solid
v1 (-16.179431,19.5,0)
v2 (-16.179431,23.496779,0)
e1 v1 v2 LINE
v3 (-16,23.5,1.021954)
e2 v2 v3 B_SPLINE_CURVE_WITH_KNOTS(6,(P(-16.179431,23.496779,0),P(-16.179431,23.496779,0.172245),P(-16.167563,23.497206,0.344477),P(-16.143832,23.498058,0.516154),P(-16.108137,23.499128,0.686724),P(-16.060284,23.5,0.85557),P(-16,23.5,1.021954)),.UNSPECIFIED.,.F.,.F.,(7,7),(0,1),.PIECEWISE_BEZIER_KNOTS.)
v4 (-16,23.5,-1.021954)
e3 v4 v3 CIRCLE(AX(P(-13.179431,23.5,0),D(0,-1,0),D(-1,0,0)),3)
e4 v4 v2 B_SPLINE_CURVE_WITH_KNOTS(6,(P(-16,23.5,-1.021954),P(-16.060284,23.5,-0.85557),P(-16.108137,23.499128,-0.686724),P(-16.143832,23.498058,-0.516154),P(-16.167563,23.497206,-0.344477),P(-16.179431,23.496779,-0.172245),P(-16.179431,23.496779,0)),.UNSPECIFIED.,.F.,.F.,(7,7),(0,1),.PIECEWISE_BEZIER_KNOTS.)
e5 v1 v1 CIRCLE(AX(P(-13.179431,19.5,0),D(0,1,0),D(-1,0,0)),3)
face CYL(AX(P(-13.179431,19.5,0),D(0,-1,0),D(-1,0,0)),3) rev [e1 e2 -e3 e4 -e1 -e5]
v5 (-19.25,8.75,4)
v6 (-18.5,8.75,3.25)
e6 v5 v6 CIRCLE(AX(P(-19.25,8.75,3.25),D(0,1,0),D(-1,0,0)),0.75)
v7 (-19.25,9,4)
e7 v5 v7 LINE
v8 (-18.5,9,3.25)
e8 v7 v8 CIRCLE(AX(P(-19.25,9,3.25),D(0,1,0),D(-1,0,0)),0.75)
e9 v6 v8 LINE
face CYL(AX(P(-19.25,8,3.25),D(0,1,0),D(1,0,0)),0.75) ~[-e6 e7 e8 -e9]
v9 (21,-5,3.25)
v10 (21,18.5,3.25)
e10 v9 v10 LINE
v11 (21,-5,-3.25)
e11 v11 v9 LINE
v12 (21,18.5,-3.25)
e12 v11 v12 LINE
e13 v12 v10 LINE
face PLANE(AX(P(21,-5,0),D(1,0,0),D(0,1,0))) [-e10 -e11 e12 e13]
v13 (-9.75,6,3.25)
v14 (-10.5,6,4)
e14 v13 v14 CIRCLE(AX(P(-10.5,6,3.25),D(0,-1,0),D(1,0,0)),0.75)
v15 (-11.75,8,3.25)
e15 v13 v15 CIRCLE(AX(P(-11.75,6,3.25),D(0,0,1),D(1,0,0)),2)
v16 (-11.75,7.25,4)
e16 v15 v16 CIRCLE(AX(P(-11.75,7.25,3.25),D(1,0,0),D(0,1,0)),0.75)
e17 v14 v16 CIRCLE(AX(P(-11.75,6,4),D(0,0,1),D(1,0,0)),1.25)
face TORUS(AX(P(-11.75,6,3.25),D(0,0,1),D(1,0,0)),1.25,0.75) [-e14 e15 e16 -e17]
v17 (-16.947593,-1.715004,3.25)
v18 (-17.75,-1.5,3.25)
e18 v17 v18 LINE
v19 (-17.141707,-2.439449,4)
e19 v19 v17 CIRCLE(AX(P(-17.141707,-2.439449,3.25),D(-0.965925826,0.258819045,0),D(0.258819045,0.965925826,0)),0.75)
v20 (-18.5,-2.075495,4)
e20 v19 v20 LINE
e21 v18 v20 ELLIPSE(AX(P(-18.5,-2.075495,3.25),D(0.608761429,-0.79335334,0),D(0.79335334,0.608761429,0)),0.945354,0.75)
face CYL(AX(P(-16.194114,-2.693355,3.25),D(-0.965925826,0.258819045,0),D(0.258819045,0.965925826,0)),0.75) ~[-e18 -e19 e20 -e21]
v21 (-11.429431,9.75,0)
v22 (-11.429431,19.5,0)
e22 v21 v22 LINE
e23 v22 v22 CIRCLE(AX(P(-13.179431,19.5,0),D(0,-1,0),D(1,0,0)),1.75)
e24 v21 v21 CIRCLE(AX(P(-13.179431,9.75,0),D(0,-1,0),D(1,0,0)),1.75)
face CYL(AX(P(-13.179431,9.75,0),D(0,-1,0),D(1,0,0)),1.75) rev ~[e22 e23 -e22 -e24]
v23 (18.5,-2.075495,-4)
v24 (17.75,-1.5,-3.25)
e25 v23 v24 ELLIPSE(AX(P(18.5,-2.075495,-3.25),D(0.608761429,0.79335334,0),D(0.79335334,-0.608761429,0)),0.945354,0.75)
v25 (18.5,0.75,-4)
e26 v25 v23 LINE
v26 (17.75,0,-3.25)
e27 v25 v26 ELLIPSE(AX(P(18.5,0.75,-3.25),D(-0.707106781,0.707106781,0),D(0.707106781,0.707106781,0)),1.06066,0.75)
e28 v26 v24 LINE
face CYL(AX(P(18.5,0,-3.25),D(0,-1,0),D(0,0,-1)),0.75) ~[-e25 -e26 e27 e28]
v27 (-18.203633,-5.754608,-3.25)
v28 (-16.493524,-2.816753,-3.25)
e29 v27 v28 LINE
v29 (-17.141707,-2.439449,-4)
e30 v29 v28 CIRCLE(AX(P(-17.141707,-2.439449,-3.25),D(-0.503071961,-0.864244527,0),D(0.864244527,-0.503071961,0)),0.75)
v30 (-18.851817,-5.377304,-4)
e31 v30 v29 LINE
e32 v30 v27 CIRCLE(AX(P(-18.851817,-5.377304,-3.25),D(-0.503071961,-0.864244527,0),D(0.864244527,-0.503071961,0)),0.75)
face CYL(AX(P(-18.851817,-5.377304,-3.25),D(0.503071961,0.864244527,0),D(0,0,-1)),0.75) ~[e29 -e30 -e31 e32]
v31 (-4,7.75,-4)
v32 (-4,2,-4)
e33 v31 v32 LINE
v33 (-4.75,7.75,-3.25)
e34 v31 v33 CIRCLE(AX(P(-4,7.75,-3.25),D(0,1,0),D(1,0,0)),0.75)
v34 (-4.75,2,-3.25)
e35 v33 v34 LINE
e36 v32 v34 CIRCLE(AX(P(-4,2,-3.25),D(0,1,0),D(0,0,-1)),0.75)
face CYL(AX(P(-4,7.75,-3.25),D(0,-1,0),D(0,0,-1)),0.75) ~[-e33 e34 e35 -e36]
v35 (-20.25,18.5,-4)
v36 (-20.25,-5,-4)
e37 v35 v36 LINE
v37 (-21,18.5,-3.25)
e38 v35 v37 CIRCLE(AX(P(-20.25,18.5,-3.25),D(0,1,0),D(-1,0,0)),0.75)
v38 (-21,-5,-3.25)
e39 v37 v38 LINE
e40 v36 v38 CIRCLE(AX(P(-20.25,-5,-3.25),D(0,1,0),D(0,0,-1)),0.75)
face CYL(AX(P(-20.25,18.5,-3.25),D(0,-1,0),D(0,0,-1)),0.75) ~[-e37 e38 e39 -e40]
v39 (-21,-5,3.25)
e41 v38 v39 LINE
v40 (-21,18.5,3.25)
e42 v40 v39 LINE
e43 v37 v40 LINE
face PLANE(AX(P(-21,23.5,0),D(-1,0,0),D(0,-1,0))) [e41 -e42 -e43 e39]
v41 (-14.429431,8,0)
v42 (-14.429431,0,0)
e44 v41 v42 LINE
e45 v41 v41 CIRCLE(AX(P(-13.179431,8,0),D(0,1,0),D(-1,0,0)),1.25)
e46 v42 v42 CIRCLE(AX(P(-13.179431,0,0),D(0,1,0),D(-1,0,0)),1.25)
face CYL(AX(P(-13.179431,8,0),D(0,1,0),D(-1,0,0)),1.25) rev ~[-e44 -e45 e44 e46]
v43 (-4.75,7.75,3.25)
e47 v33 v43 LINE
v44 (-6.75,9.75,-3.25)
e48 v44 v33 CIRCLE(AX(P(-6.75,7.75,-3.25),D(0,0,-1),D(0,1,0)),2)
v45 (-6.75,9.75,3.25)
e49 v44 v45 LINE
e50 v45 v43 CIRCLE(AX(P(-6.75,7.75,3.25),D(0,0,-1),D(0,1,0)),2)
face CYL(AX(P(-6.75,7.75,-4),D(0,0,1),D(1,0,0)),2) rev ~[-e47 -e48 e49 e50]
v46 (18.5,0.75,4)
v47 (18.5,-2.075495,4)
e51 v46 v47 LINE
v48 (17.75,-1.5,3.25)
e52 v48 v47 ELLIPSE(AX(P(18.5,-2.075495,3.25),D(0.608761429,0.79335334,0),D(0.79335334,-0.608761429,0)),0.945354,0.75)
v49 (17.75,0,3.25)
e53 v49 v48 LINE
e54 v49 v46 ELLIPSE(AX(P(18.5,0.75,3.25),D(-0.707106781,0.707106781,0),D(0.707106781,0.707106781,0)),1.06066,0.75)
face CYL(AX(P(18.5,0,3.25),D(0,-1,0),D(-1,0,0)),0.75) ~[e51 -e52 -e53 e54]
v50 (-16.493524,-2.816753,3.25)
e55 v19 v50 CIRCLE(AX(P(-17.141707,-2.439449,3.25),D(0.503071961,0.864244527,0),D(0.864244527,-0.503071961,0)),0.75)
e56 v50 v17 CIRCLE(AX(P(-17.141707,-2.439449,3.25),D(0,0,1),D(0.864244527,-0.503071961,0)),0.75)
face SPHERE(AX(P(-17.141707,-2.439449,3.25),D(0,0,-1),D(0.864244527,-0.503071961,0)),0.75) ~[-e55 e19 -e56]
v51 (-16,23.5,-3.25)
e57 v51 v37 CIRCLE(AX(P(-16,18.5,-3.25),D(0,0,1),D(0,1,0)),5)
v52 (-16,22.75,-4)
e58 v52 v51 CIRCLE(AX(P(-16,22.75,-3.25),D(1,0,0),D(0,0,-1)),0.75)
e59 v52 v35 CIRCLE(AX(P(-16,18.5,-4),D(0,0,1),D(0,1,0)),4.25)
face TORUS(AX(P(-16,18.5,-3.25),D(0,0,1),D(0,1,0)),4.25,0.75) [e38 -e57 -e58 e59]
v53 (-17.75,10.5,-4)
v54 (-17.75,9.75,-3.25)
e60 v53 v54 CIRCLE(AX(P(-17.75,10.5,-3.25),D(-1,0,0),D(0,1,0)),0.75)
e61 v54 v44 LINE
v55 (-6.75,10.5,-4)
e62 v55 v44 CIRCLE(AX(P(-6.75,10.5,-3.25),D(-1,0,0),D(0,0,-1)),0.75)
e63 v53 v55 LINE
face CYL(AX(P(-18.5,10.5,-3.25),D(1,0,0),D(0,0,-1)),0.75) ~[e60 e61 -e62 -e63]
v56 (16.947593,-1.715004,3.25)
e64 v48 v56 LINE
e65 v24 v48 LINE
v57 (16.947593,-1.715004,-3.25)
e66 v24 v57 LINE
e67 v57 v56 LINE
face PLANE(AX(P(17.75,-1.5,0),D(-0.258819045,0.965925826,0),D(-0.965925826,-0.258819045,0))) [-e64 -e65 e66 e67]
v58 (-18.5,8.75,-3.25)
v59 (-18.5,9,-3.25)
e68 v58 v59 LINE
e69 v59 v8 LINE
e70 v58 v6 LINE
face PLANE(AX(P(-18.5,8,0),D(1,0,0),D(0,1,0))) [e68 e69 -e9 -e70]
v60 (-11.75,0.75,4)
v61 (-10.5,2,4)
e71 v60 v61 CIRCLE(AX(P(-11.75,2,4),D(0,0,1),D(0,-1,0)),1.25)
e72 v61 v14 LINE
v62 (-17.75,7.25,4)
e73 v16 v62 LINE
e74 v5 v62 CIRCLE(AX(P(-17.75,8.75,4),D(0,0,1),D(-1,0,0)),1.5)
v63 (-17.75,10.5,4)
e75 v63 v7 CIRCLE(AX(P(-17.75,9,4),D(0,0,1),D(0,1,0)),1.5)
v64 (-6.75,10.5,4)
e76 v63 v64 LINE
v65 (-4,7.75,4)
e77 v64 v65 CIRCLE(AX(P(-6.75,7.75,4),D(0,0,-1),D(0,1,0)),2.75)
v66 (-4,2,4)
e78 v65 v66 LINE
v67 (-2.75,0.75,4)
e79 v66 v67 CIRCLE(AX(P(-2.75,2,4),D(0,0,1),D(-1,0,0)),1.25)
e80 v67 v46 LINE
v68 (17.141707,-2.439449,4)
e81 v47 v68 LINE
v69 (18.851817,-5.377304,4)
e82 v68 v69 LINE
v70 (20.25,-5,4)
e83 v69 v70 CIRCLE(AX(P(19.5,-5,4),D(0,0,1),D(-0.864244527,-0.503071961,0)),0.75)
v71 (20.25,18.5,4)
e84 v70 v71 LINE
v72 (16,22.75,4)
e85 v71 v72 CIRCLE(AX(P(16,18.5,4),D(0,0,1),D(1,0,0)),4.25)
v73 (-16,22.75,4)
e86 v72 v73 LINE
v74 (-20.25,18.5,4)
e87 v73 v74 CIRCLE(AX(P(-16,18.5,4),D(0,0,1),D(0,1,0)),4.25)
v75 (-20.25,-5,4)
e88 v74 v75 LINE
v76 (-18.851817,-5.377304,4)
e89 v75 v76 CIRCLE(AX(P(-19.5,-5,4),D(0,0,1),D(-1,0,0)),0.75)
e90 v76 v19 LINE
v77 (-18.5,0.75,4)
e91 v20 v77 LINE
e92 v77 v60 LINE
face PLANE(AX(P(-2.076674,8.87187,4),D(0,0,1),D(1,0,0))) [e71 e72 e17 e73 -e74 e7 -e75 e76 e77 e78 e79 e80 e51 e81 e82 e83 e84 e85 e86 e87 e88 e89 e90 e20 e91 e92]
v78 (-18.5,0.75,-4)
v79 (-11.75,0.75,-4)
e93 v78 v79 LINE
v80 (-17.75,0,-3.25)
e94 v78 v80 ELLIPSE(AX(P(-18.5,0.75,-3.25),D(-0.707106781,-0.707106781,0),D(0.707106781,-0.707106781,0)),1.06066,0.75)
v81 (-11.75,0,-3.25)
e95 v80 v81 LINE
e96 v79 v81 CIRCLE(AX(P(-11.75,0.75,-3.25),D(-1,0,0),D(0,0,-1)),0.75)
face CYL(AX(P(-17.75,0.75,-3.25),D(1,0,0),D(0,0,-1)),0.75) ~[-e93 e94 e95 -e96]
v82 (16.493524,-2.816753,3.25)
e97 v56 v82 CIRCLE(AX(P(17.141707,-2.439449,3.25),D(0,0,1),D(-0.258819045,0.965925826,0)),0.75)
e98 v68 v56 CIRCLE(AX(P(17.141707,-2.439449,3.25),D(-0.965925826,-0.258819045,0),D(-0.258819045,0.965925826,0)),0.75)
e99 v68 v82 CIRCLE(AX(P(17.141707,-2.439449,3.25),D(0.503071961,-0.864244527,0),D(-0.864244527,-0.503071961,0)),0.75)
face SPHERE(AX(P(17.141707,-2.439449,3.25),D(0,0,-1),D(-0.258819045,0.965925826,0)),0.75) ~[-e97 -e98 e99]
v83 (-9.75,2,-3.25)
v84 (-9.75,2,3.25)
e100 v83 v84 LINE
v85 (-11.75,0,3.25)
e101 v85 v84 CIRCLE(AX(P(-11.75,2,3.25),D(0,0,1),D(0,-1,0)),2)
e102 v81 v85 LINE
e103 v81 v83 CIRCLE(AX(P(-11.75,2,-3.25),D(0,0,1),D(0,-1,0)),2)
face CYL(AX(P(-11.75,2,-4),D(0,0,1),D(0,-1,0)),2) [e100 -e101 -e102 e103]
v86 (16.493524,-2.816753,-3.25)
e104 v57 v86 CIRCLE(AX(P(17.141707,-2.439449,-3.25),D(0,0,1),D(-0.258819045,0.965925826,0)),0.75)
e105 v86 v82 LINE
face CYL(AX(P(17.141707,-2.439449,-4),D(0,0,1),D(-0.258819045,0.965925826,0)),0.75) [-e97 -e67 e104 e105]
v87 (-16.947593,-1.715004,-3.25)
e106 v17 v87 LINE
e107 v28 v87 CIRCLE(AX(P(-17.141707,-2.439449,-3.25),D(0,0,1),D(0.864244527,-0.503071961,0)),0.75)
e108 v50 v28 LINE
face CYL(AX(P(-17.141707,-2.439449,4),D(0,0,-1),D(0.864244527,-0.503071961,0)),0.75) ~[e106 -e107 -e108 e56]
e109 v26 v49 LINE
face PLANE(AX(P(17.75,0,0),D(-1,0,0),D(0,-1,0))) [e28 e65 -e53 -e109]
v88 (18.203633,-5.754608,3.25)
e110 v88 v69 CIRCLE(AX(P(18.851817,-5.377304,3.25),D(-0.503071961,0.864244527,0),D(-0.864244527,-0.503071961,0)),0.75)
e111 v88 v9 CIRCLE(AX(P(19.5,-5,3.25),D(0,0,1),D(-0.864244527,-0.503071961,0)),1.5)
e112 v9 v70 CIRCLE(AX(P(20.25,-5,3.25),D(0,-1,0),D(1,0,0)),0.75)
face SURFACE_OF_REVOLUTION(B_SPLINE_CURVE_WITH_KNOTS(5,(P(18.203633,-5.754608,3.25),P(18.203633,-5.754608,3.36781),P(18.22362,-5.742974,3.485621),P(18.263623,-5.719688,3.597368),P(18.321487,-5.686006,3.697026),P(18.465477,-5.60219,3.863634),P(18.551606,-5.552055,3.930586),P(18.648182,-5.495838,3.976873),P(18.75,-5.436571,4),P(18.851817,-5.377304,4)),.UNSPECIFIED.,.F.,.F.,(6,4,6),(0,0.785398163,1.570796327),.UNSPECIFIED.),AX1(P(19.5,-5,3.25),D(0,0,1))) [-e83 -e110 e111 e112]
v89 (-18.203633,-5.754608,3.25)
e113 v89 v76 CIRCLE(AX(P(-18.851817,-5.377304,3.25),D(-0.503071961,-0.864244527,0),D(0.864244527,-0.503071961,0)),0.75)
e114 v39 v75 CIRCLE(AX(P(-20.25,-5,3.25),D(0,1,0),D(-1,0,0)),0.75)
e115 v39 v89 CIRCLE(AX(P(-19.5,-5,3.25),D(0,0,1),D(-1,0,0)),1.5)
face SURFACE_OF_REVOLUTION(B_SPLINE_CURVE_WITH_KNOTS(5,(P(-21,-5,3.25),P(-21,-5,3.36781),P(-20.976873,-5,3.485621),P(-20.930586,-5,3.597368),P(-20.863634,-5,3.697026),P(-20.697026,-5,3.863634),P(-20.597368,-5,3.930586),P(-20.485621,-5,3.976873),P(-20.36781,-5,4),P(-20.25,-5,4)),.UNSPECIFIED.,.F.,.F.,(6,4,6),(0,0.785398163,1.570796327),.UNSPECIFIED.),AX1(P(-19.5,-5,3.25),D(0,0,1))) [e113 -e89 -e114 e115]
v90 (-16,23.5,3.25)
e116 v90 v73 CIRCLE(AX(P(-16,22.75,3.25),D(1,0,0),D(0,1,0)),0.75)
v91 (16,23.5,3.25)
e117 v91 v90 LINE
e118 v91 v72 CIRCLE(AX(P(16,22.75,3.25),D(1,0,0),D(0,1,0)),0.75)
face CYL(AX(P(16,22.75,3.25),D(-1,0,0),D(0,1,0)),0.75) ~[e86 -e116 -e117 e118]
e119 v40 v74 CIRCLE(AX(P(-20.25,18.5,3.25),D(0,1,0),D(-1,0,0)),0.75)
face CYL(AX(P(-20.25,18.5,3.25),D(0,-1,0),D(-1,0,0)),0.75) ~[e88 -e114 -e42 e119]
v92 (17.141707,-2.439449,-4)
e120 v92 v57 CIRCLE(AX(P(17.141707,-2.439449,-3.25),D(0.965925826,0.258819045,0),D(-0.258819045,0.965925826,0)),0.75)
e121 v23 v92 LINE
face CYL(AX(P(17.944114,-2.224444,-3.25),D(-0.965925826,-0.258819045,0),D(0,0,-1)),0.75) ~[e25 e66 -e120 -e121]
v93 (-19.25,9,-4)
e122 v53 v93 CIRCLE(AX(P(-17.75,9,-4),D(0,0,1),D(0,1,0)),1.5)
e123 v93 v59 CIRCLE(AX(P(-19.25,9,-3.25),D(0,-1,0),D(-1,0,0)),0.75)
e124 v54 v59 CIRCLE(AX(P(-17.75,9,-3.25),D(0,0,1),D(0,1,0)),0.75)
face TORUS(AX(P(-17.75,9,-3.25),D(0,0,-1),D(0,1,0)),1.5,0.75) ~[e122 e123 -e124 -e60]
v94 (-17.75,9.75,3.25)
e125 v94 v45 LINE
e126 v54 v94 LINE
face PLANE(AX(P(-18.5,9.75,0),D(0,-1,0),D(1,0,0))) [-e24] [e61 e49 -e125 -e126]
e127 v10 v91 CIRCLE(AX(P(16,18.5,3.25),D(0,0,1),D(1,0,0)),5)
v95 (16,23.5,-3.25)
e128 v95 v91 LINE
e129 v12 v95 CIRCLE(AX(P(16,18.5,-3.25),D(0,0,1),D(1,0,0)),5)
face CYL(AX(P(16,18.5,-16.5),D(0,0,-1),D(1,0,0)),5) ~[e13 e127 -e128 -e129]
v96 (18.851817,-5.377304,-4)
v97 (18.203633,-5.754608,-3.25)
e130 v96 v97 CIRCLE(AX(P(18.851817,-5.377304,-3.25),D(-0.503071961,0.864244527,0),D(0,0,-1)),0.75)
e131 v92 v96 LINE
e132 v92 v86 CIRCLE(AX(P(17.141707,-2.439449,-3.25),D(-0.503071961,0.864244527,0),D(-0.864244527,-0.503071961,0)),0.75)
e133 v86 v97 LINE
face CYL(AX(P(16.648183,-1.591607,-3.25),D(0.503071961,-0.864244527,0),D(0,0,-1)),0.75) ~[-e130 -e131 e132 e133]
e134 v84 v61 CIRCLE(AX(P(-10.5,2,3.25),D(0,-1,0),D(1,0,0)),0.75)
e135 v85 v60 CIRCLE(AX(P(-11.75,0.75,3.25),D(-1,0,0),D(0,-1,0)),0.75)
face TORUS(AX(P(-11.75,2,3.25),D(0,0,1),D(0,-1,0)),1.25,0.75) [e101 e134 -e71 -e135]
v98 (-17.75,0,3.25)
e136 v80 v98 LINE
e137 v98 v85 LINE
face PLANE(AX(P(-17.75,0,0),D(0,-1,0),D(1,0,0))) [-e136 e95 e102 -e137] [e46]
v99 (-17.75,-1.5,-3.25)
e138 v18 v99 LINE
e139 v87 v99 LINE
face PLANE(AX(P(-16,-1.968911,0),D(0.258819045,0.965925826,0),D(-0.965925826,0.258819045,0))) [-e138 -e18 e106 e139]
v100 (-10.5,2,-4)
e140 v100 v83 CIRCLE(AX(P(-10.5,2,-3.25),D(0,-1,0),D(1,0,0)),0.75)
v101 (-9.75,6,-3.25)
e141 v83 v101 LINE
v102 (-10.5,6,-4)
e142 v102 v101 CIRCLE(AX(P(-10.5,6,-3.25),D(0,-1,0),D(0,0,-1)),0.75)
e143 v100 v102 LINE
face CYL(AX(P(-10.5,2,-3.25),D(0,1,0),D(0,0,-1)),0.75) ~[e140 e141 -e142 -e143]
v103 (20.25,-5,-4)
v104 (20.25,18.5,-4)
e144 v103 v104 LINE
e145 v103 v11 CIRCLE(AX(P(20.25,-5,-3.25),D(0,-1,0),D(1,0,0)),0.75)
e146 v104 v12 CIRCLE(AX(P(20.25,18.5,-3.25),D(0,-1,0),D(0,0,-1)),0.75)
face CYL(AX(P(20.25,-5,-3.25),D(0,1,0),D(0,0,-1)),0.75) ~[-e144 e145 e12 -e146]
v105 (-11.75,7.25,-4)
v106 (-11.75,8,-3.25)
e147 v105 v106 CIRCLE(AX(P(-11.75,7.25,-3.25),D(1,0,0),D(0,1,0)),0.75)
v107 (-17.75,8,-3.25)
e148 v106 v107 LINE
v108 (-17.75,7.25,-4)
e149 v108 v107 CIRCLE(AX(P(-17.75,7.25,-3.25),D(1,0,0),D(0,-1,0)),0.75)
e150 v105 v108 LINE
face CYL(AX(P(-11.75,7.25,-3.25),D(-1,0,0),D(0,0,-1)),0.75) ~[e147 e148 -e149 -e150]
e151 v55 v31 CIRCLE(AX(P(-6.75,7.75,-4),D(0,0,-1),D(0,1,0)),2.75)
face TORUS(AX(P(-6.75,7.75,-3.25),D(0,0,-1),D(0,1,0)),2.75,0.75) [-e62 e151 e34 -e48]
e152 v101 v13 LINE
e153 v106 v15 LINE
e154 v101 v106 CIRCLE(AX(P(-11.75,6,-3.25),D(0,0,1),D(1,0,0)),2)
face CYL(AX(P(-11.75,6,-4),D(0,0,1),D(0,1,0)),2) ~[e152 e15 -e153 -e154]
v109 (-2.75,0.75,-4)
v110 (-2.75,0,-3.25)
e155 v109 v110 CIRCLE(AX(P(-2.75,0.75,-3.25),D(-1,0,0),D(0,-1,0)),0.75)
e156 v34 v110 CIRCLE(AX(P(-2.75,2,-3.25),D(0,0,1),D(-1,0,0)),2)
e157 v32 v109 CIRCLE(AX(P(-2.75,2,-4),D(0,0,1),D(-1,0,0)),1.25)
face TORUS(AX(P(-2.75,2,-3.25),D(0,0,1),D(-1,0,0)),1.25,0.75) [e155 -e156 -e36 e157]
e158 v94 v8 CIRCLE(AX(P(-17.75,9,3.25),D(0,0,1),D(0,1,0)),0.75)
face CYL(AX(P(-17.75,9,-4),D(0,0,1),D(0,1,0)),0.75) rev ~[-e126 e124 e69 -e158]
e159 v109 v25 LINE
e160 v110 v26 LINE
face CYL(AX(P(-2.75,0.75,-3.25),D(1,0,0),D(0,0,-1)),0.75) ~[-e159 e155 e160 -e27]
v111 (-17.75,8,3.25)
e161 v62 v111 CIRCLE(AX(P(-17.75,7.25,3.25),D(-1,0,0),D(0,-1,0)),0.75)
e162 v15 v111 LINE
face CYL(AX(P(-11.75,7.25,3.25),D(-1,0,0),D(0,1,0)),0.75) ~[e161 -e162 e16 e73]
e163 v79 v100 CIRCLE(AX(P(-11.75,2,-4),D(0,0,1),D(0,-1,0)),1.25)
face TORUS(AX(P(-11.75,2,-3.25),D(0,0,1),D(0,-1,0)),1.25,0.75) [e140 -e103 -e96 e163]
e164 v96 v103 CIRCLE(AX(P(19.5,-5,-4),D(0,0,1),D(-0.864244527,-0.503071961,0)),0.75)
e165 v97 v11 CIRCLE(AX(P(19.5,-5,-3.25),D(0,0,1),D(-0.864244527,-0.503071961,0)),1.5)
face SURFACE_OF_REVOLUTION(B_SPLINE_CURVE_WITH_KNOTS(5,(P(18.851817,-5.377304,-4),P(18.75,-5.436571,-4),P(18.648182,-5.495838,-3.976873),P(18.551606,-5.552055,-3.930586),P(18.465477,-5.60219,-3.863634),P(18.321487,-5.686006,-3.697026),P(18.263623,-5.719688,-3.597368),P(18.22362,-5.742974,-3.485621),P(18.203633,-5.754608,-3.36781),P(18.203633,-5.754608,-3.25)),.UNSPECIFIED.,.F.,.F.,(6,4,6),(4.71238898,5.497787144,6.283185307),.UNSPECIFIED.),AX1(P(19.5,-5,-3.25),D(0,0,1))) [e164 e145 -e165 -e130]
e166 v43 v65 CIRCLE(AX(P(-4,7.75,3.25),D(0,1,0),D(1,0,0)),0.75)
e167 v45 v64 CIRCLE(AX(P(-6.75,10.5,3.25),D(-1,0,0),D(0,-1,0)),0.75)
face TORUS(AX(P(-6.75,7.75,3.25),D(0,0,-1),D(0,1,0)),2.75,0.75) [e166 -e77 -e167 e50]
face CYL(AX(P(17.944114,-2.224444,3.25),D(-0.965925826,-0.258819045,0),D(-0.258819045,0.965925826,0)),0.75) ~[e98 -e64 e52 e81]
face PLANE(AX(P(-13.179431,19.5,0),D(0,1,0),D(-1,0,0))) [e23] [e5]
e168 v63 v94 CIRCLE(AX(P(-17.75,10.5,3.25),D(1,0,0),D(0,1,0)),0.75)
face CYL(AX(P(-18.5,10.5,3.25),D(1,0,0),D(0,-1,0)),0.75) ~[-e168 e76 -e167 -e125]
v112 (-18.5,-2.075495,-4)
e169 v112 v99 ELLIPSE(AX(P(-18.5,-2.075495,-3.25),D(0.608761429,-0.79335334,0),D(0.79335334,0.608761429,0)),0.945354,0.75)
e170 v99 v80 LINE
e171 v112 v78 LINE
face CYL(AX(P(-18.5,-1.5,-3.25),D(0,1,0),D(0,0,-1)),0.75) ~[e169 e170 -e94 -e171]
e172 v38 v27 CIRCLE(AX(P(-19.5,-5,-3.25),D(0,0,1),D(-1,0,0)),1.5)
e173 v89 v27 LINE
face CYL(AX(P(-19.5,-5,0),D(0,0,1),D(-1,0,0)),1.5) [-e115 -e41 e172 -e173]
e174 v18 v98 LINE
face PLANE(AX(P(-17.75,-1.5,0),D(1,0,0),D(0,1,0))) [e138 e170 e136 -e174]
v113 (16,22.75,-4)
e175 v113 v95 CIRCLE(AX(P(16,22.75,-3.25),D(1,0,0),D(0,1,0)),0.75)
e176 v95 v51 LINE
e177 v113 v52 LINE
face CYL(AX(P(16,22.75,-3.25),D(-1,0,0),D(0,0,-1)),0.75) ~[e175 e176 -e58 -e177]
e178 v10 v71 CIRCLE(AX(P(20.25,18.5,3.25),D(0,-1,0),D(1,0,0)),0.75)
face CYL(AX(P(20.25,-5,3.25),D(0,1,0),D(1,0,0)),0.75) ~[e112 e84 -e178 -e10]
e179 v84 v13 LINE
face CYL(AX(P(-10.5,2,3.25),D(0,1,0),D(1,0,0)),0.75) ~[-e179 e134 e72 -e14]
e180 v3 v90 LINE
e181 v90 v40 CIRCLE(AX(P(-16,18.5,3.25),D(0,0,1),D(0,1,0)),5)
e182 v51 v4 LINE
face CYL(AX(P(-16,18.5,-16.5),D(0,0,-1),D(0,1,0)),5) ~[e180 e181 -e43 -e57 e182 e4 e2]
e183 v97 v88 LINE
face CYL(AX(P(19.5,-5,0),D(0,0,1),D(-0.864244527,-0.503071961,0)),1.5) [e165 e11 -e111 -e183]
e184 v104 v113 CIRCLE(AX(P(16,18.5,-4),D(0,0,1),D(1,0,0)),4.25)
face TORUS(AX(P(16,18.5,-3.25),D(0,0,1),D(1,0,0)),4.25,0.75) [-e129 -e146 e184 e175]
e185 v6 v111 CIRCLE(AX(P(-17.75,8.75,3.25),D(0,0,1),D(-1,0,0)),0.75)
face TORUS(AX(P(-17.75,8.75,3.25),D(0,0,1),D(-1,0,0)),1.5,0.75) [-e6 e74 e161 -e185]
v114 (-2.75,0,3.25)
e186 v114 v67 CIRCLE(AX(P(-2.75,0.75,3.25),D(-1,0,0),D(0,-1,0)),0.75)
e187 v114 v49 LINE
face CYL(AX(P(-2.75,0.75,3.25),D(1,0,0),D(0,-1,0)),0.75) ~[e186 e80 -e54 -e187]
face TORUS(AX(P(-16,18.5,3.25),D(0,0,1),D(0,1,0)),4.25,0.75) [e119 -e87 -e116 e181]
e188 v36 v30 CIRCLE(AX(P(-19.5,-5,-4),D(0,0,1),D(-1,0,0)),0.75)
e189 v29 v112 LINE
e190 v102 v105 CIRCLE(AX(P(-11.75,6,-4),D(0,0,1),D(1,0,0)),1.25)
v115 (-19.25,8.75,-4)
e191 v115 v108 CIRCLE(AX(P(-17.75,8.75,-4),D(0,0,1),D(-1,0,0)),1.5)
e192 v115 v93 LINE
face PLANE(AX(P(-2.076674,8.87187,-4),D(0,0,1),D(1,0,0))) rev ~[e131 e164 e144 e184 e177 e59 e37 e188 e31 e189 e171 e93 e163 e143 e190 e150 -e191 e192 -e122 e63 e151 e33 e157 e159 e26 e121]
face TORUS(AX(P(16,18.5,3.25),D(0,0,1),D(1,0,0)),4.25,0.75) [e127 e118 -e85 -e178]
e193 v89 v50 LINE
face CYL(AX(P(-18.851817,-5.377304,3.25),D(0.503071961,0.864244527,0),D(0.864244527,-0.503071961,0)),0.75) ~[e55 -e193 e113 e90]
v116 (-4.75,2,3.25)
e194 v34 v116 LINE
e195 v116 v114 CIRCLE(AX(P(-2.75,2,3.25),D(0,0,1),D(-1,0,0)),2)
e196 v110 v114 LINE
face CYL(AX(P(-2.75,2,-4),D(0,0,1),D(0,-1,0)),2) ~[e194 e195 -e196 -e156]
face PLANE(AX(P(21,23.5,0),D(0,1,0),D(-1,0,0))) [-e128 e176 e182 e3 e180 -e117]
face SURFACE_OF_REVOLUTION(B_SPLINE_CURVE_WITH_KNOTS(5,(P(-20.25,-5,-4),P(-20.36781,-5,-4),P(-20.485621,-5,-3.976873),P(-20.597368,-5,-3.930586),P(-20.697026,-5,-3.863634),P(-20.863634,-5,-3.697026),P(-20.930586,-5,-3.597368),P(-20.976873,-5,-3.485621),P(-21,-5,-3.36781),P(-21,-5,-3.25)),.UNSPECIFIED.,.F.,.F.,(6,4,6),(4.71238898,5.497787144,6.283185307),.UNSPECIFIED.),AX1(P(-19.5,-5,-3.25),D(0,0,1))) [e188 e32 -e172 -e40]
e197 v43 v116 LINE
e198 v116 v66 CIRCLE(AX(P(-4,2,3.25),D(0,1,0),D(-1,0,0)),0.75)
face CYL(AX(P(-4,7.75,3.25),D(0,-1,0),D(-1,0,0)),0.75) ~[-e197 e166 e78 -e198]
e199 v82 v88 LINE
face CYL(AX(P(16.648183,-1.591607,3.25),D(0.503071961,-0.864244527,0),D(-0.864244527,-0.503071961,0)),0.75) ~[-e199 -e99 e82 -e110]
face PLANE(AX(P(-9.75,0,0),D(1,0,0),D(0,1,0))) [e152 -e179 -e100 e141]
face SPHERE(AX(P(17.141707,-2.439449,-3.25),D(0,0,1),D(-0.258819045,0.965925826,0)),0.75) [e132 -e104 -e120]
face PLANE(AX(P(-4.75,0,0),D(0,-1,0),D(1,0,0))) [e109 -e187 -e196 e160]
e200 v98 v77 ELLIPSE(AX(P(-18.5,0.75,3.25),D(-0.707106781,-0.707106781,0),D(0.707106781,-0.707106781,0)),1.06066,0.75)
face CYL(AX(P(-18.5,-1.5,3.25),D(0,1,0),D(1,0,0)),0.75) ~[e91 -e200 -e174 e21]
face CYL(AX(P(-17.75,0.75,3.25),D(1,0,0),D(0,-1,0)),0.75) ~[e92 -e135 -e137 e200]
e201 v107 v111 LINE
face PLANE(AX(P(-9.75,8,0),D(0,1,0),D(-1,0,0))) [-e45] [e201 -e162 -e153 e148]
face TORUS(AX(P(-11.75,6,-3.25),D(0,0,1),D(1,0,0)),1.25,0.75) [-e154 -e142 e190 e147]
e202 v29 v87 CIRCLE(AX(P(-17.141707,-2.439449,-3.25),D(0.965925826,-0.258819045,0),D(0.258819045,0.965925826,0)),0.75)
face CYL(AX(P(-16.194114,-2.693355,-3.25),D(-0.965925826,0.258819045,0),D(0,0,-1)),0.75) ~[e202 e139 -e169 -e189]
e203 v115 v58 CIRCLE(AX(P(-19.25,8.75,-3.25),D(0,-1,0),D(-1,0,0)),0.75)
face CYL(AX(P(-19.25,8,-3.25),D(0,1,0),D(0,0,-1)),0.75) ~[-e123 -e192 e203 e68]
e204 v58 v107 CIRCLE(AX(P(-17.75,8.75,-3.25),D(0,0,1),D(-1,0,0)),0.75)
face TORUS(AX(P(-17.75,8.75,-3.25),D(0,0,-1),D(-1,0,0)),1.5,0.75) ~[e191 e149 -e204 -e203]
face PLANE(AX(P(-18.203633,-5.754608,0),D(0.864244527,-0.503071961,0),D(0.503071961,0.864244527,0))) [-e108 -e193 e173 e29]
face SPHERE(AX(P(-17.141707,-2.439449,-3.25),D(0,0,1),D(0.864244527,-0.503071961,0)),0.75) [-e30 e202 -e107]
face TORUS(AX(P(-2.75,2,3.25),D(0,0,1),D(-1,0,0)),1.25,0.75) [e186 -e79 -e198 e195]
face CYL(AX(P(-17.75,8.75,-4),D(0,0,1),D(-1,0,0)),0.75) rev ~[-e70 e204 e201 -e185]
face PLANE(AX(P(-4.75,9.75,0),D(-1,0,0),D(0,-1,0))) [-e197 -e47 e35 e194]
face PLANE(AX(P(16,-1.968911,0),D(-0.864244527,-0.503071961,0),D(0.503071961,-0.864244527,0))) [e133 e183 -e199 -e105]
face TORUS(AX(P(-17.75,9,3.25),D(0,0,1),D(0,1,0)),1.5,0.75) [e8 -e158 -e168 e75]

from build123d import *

# Parameters (mm, degrees)
F1_DEPTH    = 4
F2_R        = 1.25
F3_DEPTH    = 14.501
F4_R        = 1.75
F5_DEPTH    = 13.751
F7_R        = 3
F8_DEPTH    = 4.001
F9_T1_DEPTH = 33
F10_R       = 2
F11_R       = 0.75


# Not quite as in the source:
# - a fillet or chamfer that OpenCascade refuses, or shapes differently, is made with other operations: its cross-section is extruded or revolved along the edge and cut away or added


with BuildPart() as f1:
    # F0 (on Top) → F1 (new body, symmetric)
    with BuildSketch(Plane.XY):
        with BuildLine():
            Line((-17.75, -1.5), (-17.75, 0))
            Line((-17.75, 0), (-9.75, 0))
            Line((-9.75, 0), (-9.75, 8))
            Line((-9.75, 8), (-18.5, 8))
            Line((-18.5, 8), (-18.5, 9.75))
            Line((-18.5, 9.75), (-4.75, 9.75))
            Line((-4.75, 9.75), (-4.75, 0))
            Line((-4.75, 0), (17.75, 0))
            Line((17.75, 0), (17.75, -1.5))
            Line((17.75, -1.5), (16, -1.9689110868))
            Line((16, -1.9689110868), (18.2036332099, -5.7546079415))
            ThreePointArc((18.2036332099, -5.7546079415), (19.8908003421, -6.4481971871), (21, -5))
            Line((21, -5), (21, 23.5))
            Line((21, 23.5), (-21, 23.5))
            Line((-21, 23.5), (-21, -5))
            ThreePointArc((-21, -5), (-19.8908003421, -6.4481971871), (-18.2036332099, -5.7546079415))
            Line((-18.2036332099, -5.7546079415), (-16, -1.9689110868))
            Line((-16, -1.9689110868), (-17.75, -1.5))
        make_face()
    extrude(amount=F1_DEPTH, both=True)

    # F2 (on face) → F3 (cut, through all)
    with BuildSketch(Plane(origin=(0, 8, 0), x_dir=(-1, 0, 0), z_dir=(0, 1, 0))):
        with Locations((13.1794307381, 0)):
            Circle(F2_R)
    extrude(amount=-F3_DEPTH, mode=Mode.SUBTRACT)

    # F4 (on face) → F5 (cut, through all)
    with BuildSketch(Plane.XZ.offset(-9.75)):
        with Locations((-13.1794307381, 0)):
            Circle(F4_R)
    extrude(amount=-F5_DEPTH, mode=Mode.SUBTRACT)

    # F7 (on offset) → F8 (cut, through all)
    with BuildSketch(Plane(origin=(0, 19.5, 0), x_dir=(-1, 0, 0), z_dir=(0, 1, 0))):
        with Locations((13.1794307381, 0)):
            Circle(F7_R)
    extrude(amount=F8_DEPTH, mode=Mode.SUBTRACT)

    # F9: fillet of radius 5 on 2 edges, made by hand

    # F9_s2 → F9_t1 (cut)
    with BuildSketch(Plane.XY.offset(-16.5)):
        with BuildLine():
            ThreePointArc((-16, 23.5), (-19.5355339059, 22.0355339059), (-21, 18.5))
            Line((-21, 18.5), (-21, 23.5))
            Line((-21, 23.5), (-16, 23.5))
        make_face()
        with BuildLine():
            ThreePointArc((21, 18.5), (19.5355339059, 22.0355339059), (16, 23.5))
            Line((16, 23.5), (21, 23.5))
            Line((21, 23.5), (21, 18.5))
        make_face()
    extrude(amount=F9_T1_DEPTH, mode=Mode.SUBTRACT)

    # F10
    f10_edges = [f1.edges().sort_by_distance(p)[0] for p in [
        (-4.75, 0, 0),
        (-9.75, 0, 0),
        (-9.75, 8, 0),
        (-4.75, 9.75, 0),
    ]]
    fillet(f10_edges, radius=F10_R)

    # F11
    f11_edges = [f1.edges().sort_by_distance(p)[0] for p in [
        (-16, -1.968911, 0),
        (16, -1.968911, 0),
        (-18.5, 9.75, 0),
        (-18.5, 8, 0),
        (7.5, 0, 4),
        (-4.164214, 0.585786, 4),
        (17.75, -0.75, 4),
        (-4.75, 4.875, 4),
        (16.875, -1.734456, 4),
        (-5.335786, 9.164214, 4),
        (17.101817, -3.86176, 4),
        (-12.625, 9.75, 4),
        (19.8908, -6.448197, 4),
        (-18.5, 8.875, 4),
        (21, 6.75, 4),
        (-15.125, 8, 4),
        (19.535534, 22.035534, 4),
        (-10.335786, 7.414214, 4),
        (0, 23.5, 4),
        (-9.75, 4, 4),
        (-19.535534, 22.035534, 4),
        (-10.335786, 0.585786, 4),
        (-21, 6.75, 4),
        (-14.75, 0, 4),
        (-19.8908, -6.448197, 4),
        (-17.75, -0.75, 4),
        (-17.101817, -3.86176, 4),
        (-16.875, -1.734456, 4),
        (7.5, 0, -4),
        (-4.164214, 0.585786, -4),
        (17.75, -0.75, -4),
        (-4.75, 4.875, -4),
        (16.875, -1.734456, -4),
        (-5.335786, 9.164214, -4),
        (17.101817, -3.86176, -4),
        (-12.625, 9.75, -4),
        (19.8908, -6.448197, -4),
        (-18.5, 8.875, -4),
        (21, 6.75, -4),
        (-15.125, 8, -4),
        (19.535534, 22.035534, -4),
        (-10.335786, 7.414214, -4),
        (0, 23.5, -4),
        (-9.75, 4, -4),
        (-19.535534, 22.035534, -4),
        (-10.335786, 0.585786, -4),
        (-21, 6.75, -4),
        (-14.75, 0, -4),
        (-19.8908, -6.448197, -4),
        (-17.75, -0.75, -4),
        (-17.101817, -3.86176, -4),
        (-16.875, -1.734456, -4),
    ]]
    fillet(f11_edges, radius=F11_R)


solid = f1.part
